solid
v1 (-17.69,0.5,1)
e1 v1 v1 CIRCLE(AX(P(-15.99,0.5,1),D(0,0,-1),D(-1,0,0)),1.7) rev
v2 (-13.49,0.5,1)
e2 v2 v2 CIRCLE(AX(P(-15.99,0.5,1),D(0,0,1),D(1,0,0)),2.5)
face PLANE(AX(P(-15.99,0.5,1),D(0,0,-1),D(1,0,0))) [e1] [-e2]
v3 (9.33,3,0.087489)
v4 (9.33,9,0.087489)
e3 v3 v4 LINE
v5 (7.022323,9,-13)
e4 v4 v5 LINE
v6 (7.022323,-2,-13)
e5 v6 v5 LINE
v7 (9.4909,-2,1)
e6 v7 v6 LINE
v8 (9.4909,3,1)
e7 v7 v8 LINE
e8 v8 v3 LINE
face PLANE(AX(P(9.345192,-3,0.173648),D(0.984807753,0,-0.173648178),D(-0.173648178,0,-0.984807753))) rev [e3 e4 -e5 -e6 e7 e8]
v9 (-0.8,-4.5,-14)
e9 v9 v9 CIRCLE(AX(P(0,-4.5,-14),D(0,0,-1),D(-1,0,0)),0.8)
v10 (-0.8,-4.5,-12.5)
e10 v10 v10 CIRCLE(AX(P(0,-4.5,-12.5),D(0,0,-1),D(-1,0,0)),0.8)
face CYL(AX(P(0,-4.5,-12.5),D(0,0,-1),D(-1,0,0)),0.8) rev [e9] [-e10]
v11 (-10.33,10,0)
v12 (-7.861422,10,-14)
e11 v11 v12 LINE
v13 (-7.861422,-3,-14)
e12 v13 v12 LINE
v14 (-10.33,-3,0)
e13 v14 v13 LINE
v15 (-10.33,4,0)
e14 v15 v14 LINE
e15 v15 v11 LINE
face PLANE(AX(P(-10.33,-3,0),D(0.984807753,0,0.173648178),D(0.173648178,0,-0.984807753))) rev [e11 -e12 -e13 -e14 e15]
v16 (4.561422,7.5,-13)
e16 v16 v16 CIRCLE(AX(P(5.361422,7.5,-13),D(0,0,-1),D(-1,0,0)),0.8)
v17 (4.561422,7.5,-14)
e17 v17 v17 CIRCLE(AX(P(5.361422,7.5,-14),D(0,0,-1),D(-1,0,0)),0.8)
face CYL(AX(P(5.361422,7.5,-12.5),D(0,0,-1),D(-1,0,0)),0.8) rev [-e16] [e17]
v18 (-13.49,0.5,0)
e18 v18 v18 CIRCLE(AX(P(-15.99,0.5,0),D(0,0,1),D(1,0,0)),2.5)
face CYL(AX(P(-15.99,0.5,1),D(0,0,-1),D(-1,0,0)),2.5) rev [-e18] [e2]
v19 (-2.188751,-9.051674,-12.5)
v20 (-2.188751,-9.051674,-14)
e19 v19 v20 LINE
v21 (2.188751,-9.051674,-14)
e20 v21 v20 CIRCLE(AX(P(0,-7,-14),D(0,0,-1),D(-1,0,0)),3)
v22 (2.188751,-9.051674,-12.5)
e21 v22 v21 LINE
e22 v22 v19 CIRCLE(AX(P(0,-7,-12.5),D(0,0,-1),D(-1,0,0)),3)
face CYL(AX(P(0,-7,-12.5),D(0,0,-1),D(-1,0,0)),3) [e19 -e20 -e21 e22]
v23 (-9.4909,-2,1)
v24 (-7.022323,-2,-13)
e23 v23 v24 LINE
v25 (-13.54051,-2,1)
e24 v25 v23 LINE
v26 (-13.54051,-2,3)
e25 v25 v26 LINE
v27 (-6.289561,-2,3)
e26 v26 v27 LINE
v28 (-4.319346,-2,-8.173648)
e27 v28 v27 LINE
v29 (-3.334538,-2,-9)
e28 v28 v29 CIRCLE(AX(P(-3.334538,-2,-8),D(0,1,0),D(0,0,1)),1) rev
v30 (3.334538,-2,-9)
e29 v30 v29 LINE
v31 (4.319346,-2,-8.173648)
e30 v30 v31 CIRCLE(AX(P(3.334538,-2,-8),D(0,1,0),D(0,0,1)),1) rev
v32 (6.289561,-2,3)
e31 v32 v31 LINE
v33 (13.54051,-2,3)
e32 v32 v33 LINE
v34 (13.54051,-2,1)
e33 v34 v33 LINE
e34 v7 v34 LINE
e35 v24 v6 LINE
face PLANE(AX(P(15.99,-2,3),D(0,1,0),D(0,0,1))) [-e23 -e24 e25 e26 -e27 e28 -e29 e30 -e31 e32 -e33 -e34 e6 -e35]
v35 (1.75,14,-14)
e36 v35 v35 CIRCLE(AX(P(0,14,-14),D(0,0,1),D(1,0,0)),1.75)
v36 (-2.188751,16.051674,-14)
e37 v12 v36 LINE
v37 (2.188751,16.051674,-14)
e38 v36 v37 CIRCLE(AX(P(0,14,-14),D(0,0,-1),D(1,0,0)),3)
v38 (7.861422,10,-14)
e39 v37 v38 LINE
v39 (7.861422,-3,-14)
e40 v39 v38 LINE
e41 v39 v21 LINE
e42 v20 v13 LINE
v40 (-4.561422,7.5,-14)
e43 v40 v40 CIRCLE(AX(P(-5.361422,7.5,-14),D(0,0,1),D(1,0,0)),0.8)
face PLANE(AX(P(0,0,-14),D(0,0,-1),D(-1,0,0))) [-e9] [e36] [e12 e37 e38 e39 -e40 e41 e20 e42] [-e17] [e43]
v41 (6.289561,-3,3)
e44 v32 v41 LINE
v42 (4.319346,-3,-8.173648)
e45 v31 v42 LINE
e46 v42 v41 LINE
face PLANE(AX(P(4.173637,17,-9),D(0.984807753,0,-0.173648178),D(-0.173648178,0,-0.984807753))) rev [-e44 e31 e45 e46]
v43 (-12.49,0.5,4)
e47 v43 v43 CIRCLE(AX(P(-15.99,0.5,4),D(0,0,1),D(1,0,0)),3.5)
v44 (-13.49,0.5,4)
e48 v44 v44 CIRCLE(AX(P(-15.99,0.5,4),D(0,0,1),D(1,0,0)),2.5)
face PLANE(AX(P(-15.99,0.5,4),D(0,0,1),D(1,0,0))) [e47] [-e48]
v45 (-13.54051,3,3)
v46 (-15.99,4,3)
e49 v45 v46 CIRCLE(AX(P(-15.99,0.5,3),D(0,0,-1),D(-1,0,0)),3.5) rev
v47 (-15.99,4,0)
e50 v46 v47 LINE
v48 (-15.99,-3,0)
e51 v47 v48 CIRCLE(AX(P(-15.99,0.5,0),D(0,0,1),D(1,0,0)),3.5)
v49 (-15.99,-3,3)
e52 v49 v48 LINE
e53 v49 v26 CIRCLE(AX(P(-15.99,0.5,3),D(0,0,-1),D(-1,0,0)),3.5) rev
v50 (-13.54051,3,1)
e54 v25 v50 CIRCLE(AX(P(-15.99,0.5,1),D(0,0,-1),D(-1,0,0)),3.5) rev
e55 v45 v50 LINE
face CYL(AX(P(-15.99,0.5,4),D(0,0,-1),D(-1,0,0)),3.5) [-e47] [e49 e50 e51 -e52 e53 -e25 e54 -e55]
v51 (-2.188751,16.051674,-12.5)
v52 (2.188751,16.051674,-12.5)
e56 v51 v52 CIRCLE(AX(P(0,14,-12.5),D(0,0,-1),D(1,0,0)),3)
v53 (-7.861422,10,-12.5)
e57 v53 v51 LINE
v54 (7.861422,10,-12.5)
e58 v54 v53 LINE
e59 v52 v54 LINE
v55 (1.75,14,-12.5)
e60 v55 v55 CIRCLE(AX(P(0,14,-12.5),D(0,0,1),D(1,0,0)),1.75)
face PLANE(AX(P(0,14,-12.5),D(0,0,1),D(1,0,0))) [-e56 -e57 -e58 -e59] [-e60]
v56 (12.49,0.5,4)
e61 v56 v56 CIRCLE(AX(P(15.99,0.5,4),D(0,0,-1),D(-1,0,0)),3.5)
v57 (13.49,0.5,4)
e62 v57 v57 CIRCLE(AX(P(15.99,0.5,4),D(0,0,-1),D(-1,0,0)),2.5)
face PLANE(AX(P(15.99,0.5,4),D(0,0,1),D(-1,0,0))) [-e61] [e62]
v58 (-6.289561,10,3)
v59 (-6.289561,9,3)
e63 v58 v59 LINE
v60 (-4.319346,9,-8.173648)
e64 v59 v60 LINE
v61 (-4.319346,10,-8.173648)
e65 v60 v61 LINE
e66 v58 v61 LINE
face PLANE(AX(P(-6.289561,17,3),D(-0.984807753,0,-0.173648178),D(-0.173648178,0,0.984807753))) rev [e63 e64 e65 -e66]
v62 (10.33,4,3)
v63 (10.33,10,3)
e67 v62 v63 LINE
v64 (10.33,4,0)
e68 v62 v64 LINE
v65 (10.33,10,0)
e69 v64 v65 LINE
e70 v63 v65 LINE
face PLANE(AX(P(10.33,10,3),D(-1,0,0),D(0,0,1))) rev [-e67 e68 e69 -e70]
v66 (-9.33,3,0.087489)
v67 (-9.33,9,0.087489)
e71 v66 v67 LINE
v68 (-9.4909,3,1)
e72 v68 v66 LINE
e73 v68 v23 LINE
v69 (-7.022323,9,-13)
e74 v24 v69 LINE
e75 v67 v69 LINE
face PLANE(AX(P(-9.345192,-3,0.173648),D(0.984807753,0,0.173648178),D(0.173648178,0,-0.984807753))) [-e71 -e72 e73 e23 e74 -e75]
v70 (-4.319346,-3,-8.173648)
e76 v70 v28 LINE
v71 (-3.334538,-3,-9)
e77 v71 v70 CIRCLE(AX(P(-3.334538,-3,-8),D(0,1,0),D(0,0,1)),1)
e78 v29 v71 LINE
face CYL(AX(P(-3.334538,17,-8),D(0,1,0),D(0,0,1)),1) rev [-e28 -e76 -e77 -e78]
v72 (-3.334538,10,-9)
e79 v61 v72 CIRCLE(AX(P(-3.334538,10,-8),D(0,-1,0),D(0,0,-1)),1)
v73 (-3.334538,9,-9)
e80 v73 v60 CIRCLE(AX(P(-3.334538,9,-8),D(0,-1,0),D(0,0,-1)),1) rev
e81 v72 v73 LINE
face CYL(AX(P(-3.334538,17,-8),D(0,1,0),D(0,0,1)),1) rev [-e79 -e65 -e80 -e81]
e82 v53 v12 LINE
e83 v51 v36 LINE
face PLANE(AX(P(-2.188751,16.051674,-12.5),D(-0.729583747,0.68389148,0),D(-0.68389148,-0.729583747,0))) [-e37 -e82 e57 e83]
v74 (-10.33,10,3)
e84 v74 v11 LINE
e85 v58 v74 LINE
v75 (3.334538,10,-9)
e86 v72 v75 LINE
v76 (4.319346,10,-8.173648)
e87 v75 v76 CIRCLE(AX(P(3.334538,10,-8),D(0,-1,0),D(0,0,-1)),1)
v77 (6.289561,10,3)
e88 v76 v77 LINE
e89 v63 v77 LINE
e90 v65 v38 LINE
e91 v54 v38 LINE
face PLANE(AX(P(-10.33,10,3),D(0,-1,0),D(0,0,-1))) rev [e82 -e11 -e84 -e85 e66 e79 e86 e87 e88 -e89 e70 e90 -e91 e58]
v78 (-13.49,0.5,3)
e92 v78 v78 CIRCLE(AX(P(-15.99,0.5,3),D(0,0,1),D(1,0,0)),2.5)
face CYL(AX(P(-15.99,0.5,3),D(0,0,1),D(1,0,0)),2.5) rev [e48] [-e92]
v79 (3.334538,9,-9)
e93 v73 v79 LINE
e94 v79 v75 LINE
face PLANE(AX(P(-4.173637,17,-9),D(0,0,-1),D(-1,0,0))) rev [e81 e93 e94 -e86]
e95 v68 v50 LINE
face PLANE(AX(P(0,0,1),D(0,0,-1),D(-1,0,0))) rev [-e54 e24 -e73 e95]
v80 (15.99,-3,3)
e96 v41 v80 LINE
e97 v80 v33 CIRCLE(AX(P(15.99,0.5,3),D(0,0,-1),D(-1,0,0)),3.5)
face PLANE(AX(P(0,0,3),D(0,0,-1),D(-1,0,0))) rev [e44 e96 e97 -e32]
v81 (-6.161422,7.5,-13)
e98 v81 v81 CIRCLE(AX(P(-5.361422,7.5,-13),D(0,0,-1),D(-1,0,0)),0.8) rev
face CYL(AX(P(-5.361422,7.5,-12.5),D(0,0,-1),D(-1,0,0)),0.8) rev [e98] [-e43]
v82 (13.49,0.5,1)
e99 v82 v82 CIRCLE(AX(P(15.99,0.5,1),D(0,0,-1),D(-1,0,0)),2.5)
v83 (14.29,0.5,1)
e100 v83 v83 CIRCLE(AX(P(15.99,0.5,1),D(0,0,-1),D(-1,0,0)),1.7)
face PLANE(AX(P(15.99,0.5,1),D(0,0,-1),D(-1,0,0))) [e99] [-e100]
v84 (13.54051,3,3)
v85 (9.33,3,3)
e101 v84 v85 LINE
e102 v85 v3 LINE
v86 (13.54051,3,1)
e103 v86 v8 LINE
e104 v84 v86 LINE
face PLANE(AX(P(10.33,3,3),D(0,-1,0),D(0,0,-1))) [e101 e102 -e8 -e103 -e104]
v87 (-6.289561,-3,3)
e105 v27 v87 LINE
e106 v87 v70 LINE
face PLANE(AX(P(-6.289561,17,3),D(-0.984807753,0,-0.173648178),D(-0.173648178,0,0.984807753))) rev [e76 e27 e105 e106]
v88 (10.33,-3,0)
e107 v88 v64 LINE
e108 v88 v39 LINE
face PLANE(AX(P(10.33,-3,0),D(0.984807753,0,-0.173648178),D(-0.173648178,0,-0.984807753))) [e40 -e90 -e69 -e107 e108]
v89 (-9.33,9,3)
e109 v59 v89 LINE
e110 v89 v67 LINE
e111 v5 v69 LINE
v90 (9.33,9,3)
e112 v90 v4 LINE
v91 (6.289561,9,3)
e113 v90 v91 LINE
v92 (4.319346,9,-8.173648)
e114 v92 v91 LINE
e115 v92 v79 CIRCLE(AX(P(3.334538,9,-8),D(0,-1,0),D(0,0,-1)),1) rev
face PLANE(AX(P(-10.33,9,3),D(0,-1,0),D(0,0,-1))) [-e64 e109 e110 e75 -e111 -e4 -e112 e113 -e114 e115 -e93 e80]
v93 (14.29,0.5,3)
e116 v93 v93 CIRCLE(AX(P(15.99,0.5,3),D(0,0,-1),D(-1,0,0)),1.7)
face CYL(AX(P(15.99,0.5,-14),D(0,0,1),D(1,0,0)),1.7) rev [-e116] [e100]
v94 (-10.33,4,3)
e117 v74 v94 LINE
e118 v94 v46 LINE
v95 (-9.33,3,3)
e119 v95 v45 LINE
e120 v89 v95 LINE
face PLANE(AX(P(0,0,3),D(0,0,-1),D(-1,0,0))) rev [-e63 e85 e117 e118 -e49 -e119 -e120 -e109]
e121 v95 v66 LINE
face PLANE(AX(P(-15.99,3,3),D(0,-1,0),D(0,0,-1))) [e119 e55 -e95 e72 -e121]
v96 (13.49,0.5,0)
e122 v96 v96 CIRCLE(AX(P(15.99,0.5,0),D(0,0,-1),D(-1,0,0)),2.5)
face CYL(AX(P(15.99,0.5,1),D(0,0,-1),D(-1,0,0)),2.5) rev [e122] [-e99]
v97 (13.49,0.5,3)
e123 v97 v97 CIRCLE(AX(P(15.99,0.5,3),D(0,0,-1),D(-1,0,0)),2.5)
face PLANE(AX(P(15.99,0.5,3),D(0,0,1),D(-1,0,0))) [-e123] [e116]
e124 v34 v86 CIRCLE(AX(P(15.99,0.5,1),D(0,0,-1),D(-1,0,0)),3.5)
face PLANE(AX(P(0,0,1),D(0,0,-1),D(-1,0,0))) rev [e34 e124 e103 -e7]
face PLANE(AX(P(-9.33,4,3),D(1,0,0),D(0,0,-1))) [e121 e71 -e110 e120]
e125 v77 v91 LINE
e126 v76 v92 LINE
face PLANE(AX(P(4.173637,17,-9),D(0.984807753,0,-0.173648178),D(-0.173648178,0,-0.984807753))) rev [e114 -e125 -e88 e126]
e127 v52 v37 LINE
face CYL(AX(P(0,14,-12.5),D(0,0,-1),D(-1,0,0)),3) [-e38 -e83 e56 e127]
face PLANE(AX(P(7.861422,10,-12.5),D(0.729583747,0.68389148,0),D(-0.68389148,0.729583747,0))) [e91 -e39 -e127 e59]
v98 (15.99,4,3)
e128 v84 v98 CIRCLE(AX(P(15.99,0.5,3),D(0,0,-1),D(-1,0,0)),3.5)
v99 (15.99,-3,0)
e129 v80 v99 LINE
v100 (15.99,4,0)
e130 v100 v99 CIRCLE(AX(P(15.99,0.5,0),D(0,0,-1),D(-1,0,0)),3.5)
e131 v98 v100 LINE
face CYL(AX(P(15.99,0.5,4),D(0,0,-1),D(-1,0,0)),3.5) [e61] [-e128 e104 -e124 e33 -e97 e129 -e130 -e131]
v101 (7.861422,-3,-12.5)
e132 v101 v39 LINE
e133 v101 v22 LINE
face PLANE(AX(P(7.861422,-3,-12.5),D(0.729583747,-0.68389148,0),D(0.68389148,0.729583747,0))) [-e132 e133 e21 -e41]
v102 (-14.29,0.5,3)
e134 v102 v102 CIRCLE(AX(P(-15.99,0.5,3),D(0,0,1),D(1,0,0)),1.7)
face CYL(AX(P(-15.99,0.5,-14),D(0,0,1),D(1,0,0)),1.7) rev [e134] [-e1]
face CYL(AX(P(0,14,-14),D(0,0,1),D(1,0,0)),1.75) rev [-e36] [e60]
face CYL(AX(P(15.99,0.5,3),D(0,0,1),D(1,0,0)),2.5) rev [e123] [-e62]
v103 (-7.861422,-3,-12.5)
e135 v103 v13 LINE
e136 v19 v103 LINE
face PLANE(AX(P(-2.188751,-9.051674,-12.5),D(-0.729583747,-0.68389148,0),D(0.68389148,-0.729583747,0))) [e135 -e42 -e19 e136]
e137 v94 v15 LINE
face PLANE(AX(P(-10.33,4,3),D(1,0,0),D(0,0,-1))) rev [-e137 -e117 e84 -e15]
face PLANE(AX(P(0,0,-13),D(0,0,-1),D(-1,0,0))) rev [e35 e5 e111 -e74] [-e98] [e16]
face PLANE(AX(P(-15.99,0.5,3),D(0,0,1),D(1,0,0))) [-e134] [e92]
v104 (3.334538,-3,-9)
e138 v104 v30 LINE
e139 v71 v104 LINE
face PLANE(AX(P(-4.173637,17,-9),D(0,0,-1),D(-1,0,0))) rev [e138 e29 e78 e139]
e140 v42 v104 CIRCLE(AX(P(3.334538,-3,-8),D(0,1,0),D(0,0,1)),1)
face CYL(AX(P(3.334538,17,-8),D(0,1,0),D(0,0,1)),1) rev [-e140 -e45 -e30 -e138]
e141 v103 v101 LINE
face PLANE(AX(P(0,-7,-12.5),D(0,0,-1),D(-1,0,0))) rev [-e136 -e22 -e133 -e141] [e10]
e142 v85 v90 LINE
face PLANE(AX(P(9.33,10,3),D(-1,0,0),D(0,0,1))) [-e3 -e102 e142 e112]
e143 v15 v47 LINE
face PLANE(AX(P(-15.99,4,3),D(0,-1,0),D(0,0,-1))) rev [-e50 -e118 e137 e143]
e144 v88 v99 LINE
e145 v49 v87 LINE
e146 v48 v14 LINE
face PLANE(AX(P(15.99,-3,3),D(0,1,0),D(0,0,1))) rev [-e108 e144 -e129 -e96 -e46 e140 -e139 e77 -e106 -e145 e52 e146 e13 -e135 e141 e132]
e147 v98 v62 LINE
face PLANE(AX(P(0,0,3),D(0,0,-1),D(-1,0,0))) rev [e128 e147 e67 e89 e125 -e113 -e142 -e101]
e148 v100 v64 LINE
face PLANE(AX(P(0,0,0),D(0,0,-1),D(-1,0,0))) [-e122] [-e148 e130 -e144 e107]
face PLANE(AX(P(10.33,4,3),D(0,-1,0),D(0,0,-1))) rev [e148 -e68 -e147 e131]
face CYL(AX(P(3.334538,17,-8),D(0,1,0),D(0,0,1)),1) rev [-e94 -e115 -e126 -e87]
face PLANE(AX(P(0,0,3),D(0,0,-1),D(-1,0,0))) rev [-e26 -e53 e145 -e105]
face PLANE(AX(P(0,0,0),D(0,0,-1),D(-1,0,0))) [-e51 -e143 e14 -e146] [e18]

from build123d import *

# Parameters (mm, degrees)
ESTRUSIONE_ESTRUSIONE1_DEPTH = 3
SCHIZZO2_W                   = 20.66
SCHIZZO2_H                   = 13
ESTRUSIONE_ESTRUSIONE2_DEPTH = 14
TAGLIO_ESTRUSIONE1_DEPTH     = 25.91345219
SVUOTA1_T                    = -1
SCHIZZO4_R                   = 3.5
ESTRUSIONE_ESTRUSIONE3_DEPTH = 4
SCHIZZO5_R                   = 2.5
TAGLIO_ESTRUSIONE2_DEPTH     = 1
SCHIZZO6_R                   = 1.7
TAGLIO_ESTRUSIONE3_DEPTH     = 28.728326671
ESTRUSIONE_ESTRUSIONE4_DEPTH = 1.5
SCHIZZO8_R                   = 1.75
TAGLIO_ESTRUSIONE4_DEPTH     = 31.677517827
SCHIZZO9_R                   = 0.8
TAGLIO_ESTRUSIONE5_DEPTH     = 1.5
TAGLIO_ESTRUSIONE6_DEPTH     = 32.238759578
RACCORDO1_R                  = 1
SPECCHIA12_START             = 9
SPECCHIA12_DEPTH             = 1
RACCORDO2_R                  = 1
SPECCHIA15_START             = 9
SPECCHIA15_DEPTH             = 1
SCHIZZO12_R                  = 0.8
ESTRUSIONE_ESTRUSIONE5_DEPTH = 1.5
TAGLIO_ESTRUSIONE7_START     = -1
SCHIZZO13_R                  = 2.5
TAGLIO_ESTRUSIONE7_DEPTH     = 1


# Read off the part's stored shape, not the designer's step: Specchia12, Specchia15
with BuildPart() as part:
    # Schizzo1 → Estrusione-Estrusione1 (new body)
    with BuildSketch(Plane.XY):
        Polygon((-15.99, 4), (-10.33, 4), (-10.33, 10), (10.33, 10), (10.33, 4), (15.99, 4), (15.99, -3), (-15.99, -3), align=None)
    extrude(amount=ESTRUSIONE_ESTRUSIONE1_DEPTH)

    # Schizzo2 → Estrusione-Estrusione2 (add)
    with BuildSketch(Plane.XY):
        with Locations((0, 3.5)):
            Rectangle(SCHIZZO2_W, SCHIZZO2_H)
    extrude(amount=-ESTRUSIONE_ESTRUSIONE2_DEPTH)

    # Schizzo3 → Taglio-Estrusione1 (cut, through all)
    with BuildSketch(Plane(origin=(0, 10, 0), x_dir=(1, 0, 0), z_dir=(0, 1, 0))):
        Polygon((-10.33, 0), (-7.86142227, 14), (-10.33, 14), align=None)
    taglio_estrusione1 = extrude(amount=-TAGLIO_ESTRUSIONE1_DEPTH, mode=Mode.SUBTRACT)

    # Specchia1: Taglio-Estrusione1 across plane
    add(taglio_estrusione1.mirror(Plane(origin=(0, 0, 0), x_dir=(0, 0, 1), z_dir=(1, 0, 0))), mode=Mode.SUBTRACT)

    # Svuota1
    svuota1_openings = [part.faces().sort_by_distance(p)[0] for p in [
        (0, 2.81654304, 3),
    ]]
    offset(amount=SVUOTA1_T, openings=svuota1_openings, kind=Kind.INTERSECTION)

    # Schizzo4 → Estrusione-Estrusione3 (add)
    with BuildSketch(Plane.XY):
        with Locations(Location((-15.99, 0.5, 0), (0, 0, 270))):
            Circle(SCHIZZO4_R)
    estrusione_estrusione3 = extrude(amount=ESTRUSIONE_ESTRUSIONE3_DEPTH)

    # Schizzo5 → Taglio-Estrusione2 (cut)
    with BuildSketch(Plane.XY.offset(4)):
        with Locations((-15.99, 0.5)):
            Circle(SCHIZZO5_R)
    taglio_estrusione2 = extrude(amount=-TAGLIO_ESTRUSIONE2_DEPTH, mode=Mode.SUBTRACT)

    # Schizzo6 → Taglio-Estrusione3 (cut, through all)
    with BuildSketch(Plane.XY.offset(3)):
        with Locations((-15.99, 0.5)):
            Circle(SCHIZZO6_R)
    taglio_estrusione3 = extrude(amount=-TAGLIO_ESTRUSIONE3_DEPTH, mode=Mode.SUBTRACT)

    # Specchia2: Estrusione-Estrusione3, Taglio-Estrusione2, Taglio-Estrusione3 across plane
    add(estrusione_estrusione3.mirror(Plane(origin=(0, 0, 0), x_dir=(0, 0, 1), z_dir=(1, 0, 0))))
    add(taglio_estrusione2.mirror(Plane(origin=(0, 0, 0), x_dir=(0, 0, 1), z_dir=(1, 0, 0))), mode=Mode.SUBTRACT)
    add(taglio_estrusione3.mirror(Plane(origin=(0, 0, 0), x_dir=(0, 0, 1), z_dir=(1, 0, 0))), mode=Mode.SUBTRACT)

    # Schizzo7 → Estrusione-Estrusione4 (add)
    with BuildSketch(Plane(origin=(0, 0, -14), x_dir=(-1, 0, 0), z_dir=(0, 0, -1))):
        with BuildLine():
            Line((-7.86142227, 10), (-2.188751242, 16.051674439))
            ThreePointArc((-2.188751242, 16.051674439), (0, 17), (2.188751242, 16.051674439))
            Line((2.188751242, 16.051674439), (7.86142227, 10))
            Line((7.86142227, 10), (-7.86142227, 10))
        make_face()
    extrude(amount=-ESTRUSIONE_ESTRUSIONE4_DEPTH)

    # Schizzo8 → Taglio-Estrusione4 (cut, through all)
    with BuildSketch(Plane.XY.offset(-12.5)):
        with Locations((0, 14)):
            Circle(SCHIZZO8_R)
    extrude(amount=-TAGLIO_ESTRUSIONE4_DEPTH, mode=Mode.SUBTRACT)

    # Schizzo9 → Taglio-Estrusione5 (cut)
    with BuildSketch(Plane(origin=(0, 0, -14), x_dir=(-1, 0, 0), z_dir=(0, 0, -1))):
        with Locations((-5.36142227, 7.5)):
            Circle(SCHIZZO9_R)
    taglio_estrusione5 = extrude(amount=-TAGLIO_ESTRUSIONE5_DEPTH, mode=Mode.SUBTRACT)

    # Specchia5: Taglio-Estrusione5 across plane
    add(taglio_estrusione5.mirror(Plane(origin=(0, 0, 0), x_dir=(0, 0, 1), z_dir=(1, 0, 0))), mode=Mode.SUBTRACT)

    # Schizzo10 → Taglio-Estrusione6 (cut, through all)
    with BuildSketch(Plane.XZ.offset(3)):
        Polygon((-6.289561189, 3), (-4.17363742, -9), (4.17363742, -9), (6.289561189, 3), align=None)
    extrude(amount=-TAGLIO_ESTRUSIONE6_DEPTH, mode=Mode.SUBTRACT)

    # Raccordo1
    raccordo1_edges = [part.edges().sort_by_distance(p)[0] for p in [
        (-4.17363742, -2.5, -9),
    ]]
    fillet(raccordo1_edges, radius=RACCORDO1_R)

    # Specchia12 outline → Specchia12 (add)
    with BuildSketch(Plane(origin=(0, 0, 0), x_dir=(1, 0, 0), z_dir=(0, 1, 0)).offset(SPECCHIA12_START)):
        with BuildLine():
            ThreePointArc((-4.319345542, 8.173648178), (-3.977325399, 8.766044443), (-3.334537789, 9))
            Line((-3.334537789, 9), (-4.17363742, 9))
            Line((-4.17363742, 9), (-4.319345542, 8.173648178))
        make_face()
    extrude(amount=SPECCHIA12_DEPTH)

    # Raccordo2
    raccordo2_edges = [part.edges().sort_by_distance(p)[0] for p in [
        (4.17363742, -2.5, -9),
    ]]
    fillet(raccordo2_edges, radius=RACCORDO2_R)

    # Specchia15 outline → Specchia15 (add)
    with BuildSketch(Plane(origin=(0, 0, 0), x_dir=(1, 0, 0), z_dir=(0, 1, 0)).offset(SPECCHIA15_START)):
        with BuildLine():
            ThreePointArc((3.334537789, 9), (3.977325399, 8.766044443), (4.319345542, 8.173648178))
            Line((4.319345542, 8.173648178), (4.17363742, 9))
            Line((4.17363742, 9), (3.334537789, 9))
        make_face()
    extrude(amount=SPECCHIA15_DEPTH)

    # Schizzo12 → Estrusione-Estrusione5 (add)
    with BuildSketch(Plane(origin=(0, 0, -14), x_dir=(-1, 0, 0), z_dir=(0, 0, -1))):
        with BuildLine():
            Line((-7.86142227, -3), (-2.188751242, -9.051674439))
            ThreePointArc((-2.188751242, -9.051674439), (0, -10), (2.188751242, -9.051674439))
            Line((2.188751242, -9.051674439), (7.86142227, -3))
            Line((7.86142227, -3), (-7.86142227, -3))
        make_face()
        with Locations((0, -4.5)):
            Circle(SCHIZZO12_R, mode=Mode.SUBTRACT)
    extrude(amount=-ESTRUSIONE_ESTRUSIONE5_DEPTH)

    # Schizzo13 → Taglio-Estrusione7 (cut)
    with BuildSketch(Plane(origin=(0, 0, 0), x_dir=(-1, 0, 0), z_dir=(0, 0, -1)).offset(TAGLIO_ESTRUSIONE7_START)):
        with Locations((-15.99, 0.5)):
            Circle(SCHIZZO13_R)
    taglio_estrusione7 = extrude(amount=TAGLIO_ESTRUSIONE7_DEPTH, mode=Mode.SUBTRACT)

    # Specchia16: Taglio-Estrusione7 across plane
    add(taglio_estrusione7.mirror(Plane(origin=(0, 0, 0), x_dir=(0, 0, 1), z_dir=(1, 0, 0))), mode=Mode.SUBTRACT)


solid = part.part
